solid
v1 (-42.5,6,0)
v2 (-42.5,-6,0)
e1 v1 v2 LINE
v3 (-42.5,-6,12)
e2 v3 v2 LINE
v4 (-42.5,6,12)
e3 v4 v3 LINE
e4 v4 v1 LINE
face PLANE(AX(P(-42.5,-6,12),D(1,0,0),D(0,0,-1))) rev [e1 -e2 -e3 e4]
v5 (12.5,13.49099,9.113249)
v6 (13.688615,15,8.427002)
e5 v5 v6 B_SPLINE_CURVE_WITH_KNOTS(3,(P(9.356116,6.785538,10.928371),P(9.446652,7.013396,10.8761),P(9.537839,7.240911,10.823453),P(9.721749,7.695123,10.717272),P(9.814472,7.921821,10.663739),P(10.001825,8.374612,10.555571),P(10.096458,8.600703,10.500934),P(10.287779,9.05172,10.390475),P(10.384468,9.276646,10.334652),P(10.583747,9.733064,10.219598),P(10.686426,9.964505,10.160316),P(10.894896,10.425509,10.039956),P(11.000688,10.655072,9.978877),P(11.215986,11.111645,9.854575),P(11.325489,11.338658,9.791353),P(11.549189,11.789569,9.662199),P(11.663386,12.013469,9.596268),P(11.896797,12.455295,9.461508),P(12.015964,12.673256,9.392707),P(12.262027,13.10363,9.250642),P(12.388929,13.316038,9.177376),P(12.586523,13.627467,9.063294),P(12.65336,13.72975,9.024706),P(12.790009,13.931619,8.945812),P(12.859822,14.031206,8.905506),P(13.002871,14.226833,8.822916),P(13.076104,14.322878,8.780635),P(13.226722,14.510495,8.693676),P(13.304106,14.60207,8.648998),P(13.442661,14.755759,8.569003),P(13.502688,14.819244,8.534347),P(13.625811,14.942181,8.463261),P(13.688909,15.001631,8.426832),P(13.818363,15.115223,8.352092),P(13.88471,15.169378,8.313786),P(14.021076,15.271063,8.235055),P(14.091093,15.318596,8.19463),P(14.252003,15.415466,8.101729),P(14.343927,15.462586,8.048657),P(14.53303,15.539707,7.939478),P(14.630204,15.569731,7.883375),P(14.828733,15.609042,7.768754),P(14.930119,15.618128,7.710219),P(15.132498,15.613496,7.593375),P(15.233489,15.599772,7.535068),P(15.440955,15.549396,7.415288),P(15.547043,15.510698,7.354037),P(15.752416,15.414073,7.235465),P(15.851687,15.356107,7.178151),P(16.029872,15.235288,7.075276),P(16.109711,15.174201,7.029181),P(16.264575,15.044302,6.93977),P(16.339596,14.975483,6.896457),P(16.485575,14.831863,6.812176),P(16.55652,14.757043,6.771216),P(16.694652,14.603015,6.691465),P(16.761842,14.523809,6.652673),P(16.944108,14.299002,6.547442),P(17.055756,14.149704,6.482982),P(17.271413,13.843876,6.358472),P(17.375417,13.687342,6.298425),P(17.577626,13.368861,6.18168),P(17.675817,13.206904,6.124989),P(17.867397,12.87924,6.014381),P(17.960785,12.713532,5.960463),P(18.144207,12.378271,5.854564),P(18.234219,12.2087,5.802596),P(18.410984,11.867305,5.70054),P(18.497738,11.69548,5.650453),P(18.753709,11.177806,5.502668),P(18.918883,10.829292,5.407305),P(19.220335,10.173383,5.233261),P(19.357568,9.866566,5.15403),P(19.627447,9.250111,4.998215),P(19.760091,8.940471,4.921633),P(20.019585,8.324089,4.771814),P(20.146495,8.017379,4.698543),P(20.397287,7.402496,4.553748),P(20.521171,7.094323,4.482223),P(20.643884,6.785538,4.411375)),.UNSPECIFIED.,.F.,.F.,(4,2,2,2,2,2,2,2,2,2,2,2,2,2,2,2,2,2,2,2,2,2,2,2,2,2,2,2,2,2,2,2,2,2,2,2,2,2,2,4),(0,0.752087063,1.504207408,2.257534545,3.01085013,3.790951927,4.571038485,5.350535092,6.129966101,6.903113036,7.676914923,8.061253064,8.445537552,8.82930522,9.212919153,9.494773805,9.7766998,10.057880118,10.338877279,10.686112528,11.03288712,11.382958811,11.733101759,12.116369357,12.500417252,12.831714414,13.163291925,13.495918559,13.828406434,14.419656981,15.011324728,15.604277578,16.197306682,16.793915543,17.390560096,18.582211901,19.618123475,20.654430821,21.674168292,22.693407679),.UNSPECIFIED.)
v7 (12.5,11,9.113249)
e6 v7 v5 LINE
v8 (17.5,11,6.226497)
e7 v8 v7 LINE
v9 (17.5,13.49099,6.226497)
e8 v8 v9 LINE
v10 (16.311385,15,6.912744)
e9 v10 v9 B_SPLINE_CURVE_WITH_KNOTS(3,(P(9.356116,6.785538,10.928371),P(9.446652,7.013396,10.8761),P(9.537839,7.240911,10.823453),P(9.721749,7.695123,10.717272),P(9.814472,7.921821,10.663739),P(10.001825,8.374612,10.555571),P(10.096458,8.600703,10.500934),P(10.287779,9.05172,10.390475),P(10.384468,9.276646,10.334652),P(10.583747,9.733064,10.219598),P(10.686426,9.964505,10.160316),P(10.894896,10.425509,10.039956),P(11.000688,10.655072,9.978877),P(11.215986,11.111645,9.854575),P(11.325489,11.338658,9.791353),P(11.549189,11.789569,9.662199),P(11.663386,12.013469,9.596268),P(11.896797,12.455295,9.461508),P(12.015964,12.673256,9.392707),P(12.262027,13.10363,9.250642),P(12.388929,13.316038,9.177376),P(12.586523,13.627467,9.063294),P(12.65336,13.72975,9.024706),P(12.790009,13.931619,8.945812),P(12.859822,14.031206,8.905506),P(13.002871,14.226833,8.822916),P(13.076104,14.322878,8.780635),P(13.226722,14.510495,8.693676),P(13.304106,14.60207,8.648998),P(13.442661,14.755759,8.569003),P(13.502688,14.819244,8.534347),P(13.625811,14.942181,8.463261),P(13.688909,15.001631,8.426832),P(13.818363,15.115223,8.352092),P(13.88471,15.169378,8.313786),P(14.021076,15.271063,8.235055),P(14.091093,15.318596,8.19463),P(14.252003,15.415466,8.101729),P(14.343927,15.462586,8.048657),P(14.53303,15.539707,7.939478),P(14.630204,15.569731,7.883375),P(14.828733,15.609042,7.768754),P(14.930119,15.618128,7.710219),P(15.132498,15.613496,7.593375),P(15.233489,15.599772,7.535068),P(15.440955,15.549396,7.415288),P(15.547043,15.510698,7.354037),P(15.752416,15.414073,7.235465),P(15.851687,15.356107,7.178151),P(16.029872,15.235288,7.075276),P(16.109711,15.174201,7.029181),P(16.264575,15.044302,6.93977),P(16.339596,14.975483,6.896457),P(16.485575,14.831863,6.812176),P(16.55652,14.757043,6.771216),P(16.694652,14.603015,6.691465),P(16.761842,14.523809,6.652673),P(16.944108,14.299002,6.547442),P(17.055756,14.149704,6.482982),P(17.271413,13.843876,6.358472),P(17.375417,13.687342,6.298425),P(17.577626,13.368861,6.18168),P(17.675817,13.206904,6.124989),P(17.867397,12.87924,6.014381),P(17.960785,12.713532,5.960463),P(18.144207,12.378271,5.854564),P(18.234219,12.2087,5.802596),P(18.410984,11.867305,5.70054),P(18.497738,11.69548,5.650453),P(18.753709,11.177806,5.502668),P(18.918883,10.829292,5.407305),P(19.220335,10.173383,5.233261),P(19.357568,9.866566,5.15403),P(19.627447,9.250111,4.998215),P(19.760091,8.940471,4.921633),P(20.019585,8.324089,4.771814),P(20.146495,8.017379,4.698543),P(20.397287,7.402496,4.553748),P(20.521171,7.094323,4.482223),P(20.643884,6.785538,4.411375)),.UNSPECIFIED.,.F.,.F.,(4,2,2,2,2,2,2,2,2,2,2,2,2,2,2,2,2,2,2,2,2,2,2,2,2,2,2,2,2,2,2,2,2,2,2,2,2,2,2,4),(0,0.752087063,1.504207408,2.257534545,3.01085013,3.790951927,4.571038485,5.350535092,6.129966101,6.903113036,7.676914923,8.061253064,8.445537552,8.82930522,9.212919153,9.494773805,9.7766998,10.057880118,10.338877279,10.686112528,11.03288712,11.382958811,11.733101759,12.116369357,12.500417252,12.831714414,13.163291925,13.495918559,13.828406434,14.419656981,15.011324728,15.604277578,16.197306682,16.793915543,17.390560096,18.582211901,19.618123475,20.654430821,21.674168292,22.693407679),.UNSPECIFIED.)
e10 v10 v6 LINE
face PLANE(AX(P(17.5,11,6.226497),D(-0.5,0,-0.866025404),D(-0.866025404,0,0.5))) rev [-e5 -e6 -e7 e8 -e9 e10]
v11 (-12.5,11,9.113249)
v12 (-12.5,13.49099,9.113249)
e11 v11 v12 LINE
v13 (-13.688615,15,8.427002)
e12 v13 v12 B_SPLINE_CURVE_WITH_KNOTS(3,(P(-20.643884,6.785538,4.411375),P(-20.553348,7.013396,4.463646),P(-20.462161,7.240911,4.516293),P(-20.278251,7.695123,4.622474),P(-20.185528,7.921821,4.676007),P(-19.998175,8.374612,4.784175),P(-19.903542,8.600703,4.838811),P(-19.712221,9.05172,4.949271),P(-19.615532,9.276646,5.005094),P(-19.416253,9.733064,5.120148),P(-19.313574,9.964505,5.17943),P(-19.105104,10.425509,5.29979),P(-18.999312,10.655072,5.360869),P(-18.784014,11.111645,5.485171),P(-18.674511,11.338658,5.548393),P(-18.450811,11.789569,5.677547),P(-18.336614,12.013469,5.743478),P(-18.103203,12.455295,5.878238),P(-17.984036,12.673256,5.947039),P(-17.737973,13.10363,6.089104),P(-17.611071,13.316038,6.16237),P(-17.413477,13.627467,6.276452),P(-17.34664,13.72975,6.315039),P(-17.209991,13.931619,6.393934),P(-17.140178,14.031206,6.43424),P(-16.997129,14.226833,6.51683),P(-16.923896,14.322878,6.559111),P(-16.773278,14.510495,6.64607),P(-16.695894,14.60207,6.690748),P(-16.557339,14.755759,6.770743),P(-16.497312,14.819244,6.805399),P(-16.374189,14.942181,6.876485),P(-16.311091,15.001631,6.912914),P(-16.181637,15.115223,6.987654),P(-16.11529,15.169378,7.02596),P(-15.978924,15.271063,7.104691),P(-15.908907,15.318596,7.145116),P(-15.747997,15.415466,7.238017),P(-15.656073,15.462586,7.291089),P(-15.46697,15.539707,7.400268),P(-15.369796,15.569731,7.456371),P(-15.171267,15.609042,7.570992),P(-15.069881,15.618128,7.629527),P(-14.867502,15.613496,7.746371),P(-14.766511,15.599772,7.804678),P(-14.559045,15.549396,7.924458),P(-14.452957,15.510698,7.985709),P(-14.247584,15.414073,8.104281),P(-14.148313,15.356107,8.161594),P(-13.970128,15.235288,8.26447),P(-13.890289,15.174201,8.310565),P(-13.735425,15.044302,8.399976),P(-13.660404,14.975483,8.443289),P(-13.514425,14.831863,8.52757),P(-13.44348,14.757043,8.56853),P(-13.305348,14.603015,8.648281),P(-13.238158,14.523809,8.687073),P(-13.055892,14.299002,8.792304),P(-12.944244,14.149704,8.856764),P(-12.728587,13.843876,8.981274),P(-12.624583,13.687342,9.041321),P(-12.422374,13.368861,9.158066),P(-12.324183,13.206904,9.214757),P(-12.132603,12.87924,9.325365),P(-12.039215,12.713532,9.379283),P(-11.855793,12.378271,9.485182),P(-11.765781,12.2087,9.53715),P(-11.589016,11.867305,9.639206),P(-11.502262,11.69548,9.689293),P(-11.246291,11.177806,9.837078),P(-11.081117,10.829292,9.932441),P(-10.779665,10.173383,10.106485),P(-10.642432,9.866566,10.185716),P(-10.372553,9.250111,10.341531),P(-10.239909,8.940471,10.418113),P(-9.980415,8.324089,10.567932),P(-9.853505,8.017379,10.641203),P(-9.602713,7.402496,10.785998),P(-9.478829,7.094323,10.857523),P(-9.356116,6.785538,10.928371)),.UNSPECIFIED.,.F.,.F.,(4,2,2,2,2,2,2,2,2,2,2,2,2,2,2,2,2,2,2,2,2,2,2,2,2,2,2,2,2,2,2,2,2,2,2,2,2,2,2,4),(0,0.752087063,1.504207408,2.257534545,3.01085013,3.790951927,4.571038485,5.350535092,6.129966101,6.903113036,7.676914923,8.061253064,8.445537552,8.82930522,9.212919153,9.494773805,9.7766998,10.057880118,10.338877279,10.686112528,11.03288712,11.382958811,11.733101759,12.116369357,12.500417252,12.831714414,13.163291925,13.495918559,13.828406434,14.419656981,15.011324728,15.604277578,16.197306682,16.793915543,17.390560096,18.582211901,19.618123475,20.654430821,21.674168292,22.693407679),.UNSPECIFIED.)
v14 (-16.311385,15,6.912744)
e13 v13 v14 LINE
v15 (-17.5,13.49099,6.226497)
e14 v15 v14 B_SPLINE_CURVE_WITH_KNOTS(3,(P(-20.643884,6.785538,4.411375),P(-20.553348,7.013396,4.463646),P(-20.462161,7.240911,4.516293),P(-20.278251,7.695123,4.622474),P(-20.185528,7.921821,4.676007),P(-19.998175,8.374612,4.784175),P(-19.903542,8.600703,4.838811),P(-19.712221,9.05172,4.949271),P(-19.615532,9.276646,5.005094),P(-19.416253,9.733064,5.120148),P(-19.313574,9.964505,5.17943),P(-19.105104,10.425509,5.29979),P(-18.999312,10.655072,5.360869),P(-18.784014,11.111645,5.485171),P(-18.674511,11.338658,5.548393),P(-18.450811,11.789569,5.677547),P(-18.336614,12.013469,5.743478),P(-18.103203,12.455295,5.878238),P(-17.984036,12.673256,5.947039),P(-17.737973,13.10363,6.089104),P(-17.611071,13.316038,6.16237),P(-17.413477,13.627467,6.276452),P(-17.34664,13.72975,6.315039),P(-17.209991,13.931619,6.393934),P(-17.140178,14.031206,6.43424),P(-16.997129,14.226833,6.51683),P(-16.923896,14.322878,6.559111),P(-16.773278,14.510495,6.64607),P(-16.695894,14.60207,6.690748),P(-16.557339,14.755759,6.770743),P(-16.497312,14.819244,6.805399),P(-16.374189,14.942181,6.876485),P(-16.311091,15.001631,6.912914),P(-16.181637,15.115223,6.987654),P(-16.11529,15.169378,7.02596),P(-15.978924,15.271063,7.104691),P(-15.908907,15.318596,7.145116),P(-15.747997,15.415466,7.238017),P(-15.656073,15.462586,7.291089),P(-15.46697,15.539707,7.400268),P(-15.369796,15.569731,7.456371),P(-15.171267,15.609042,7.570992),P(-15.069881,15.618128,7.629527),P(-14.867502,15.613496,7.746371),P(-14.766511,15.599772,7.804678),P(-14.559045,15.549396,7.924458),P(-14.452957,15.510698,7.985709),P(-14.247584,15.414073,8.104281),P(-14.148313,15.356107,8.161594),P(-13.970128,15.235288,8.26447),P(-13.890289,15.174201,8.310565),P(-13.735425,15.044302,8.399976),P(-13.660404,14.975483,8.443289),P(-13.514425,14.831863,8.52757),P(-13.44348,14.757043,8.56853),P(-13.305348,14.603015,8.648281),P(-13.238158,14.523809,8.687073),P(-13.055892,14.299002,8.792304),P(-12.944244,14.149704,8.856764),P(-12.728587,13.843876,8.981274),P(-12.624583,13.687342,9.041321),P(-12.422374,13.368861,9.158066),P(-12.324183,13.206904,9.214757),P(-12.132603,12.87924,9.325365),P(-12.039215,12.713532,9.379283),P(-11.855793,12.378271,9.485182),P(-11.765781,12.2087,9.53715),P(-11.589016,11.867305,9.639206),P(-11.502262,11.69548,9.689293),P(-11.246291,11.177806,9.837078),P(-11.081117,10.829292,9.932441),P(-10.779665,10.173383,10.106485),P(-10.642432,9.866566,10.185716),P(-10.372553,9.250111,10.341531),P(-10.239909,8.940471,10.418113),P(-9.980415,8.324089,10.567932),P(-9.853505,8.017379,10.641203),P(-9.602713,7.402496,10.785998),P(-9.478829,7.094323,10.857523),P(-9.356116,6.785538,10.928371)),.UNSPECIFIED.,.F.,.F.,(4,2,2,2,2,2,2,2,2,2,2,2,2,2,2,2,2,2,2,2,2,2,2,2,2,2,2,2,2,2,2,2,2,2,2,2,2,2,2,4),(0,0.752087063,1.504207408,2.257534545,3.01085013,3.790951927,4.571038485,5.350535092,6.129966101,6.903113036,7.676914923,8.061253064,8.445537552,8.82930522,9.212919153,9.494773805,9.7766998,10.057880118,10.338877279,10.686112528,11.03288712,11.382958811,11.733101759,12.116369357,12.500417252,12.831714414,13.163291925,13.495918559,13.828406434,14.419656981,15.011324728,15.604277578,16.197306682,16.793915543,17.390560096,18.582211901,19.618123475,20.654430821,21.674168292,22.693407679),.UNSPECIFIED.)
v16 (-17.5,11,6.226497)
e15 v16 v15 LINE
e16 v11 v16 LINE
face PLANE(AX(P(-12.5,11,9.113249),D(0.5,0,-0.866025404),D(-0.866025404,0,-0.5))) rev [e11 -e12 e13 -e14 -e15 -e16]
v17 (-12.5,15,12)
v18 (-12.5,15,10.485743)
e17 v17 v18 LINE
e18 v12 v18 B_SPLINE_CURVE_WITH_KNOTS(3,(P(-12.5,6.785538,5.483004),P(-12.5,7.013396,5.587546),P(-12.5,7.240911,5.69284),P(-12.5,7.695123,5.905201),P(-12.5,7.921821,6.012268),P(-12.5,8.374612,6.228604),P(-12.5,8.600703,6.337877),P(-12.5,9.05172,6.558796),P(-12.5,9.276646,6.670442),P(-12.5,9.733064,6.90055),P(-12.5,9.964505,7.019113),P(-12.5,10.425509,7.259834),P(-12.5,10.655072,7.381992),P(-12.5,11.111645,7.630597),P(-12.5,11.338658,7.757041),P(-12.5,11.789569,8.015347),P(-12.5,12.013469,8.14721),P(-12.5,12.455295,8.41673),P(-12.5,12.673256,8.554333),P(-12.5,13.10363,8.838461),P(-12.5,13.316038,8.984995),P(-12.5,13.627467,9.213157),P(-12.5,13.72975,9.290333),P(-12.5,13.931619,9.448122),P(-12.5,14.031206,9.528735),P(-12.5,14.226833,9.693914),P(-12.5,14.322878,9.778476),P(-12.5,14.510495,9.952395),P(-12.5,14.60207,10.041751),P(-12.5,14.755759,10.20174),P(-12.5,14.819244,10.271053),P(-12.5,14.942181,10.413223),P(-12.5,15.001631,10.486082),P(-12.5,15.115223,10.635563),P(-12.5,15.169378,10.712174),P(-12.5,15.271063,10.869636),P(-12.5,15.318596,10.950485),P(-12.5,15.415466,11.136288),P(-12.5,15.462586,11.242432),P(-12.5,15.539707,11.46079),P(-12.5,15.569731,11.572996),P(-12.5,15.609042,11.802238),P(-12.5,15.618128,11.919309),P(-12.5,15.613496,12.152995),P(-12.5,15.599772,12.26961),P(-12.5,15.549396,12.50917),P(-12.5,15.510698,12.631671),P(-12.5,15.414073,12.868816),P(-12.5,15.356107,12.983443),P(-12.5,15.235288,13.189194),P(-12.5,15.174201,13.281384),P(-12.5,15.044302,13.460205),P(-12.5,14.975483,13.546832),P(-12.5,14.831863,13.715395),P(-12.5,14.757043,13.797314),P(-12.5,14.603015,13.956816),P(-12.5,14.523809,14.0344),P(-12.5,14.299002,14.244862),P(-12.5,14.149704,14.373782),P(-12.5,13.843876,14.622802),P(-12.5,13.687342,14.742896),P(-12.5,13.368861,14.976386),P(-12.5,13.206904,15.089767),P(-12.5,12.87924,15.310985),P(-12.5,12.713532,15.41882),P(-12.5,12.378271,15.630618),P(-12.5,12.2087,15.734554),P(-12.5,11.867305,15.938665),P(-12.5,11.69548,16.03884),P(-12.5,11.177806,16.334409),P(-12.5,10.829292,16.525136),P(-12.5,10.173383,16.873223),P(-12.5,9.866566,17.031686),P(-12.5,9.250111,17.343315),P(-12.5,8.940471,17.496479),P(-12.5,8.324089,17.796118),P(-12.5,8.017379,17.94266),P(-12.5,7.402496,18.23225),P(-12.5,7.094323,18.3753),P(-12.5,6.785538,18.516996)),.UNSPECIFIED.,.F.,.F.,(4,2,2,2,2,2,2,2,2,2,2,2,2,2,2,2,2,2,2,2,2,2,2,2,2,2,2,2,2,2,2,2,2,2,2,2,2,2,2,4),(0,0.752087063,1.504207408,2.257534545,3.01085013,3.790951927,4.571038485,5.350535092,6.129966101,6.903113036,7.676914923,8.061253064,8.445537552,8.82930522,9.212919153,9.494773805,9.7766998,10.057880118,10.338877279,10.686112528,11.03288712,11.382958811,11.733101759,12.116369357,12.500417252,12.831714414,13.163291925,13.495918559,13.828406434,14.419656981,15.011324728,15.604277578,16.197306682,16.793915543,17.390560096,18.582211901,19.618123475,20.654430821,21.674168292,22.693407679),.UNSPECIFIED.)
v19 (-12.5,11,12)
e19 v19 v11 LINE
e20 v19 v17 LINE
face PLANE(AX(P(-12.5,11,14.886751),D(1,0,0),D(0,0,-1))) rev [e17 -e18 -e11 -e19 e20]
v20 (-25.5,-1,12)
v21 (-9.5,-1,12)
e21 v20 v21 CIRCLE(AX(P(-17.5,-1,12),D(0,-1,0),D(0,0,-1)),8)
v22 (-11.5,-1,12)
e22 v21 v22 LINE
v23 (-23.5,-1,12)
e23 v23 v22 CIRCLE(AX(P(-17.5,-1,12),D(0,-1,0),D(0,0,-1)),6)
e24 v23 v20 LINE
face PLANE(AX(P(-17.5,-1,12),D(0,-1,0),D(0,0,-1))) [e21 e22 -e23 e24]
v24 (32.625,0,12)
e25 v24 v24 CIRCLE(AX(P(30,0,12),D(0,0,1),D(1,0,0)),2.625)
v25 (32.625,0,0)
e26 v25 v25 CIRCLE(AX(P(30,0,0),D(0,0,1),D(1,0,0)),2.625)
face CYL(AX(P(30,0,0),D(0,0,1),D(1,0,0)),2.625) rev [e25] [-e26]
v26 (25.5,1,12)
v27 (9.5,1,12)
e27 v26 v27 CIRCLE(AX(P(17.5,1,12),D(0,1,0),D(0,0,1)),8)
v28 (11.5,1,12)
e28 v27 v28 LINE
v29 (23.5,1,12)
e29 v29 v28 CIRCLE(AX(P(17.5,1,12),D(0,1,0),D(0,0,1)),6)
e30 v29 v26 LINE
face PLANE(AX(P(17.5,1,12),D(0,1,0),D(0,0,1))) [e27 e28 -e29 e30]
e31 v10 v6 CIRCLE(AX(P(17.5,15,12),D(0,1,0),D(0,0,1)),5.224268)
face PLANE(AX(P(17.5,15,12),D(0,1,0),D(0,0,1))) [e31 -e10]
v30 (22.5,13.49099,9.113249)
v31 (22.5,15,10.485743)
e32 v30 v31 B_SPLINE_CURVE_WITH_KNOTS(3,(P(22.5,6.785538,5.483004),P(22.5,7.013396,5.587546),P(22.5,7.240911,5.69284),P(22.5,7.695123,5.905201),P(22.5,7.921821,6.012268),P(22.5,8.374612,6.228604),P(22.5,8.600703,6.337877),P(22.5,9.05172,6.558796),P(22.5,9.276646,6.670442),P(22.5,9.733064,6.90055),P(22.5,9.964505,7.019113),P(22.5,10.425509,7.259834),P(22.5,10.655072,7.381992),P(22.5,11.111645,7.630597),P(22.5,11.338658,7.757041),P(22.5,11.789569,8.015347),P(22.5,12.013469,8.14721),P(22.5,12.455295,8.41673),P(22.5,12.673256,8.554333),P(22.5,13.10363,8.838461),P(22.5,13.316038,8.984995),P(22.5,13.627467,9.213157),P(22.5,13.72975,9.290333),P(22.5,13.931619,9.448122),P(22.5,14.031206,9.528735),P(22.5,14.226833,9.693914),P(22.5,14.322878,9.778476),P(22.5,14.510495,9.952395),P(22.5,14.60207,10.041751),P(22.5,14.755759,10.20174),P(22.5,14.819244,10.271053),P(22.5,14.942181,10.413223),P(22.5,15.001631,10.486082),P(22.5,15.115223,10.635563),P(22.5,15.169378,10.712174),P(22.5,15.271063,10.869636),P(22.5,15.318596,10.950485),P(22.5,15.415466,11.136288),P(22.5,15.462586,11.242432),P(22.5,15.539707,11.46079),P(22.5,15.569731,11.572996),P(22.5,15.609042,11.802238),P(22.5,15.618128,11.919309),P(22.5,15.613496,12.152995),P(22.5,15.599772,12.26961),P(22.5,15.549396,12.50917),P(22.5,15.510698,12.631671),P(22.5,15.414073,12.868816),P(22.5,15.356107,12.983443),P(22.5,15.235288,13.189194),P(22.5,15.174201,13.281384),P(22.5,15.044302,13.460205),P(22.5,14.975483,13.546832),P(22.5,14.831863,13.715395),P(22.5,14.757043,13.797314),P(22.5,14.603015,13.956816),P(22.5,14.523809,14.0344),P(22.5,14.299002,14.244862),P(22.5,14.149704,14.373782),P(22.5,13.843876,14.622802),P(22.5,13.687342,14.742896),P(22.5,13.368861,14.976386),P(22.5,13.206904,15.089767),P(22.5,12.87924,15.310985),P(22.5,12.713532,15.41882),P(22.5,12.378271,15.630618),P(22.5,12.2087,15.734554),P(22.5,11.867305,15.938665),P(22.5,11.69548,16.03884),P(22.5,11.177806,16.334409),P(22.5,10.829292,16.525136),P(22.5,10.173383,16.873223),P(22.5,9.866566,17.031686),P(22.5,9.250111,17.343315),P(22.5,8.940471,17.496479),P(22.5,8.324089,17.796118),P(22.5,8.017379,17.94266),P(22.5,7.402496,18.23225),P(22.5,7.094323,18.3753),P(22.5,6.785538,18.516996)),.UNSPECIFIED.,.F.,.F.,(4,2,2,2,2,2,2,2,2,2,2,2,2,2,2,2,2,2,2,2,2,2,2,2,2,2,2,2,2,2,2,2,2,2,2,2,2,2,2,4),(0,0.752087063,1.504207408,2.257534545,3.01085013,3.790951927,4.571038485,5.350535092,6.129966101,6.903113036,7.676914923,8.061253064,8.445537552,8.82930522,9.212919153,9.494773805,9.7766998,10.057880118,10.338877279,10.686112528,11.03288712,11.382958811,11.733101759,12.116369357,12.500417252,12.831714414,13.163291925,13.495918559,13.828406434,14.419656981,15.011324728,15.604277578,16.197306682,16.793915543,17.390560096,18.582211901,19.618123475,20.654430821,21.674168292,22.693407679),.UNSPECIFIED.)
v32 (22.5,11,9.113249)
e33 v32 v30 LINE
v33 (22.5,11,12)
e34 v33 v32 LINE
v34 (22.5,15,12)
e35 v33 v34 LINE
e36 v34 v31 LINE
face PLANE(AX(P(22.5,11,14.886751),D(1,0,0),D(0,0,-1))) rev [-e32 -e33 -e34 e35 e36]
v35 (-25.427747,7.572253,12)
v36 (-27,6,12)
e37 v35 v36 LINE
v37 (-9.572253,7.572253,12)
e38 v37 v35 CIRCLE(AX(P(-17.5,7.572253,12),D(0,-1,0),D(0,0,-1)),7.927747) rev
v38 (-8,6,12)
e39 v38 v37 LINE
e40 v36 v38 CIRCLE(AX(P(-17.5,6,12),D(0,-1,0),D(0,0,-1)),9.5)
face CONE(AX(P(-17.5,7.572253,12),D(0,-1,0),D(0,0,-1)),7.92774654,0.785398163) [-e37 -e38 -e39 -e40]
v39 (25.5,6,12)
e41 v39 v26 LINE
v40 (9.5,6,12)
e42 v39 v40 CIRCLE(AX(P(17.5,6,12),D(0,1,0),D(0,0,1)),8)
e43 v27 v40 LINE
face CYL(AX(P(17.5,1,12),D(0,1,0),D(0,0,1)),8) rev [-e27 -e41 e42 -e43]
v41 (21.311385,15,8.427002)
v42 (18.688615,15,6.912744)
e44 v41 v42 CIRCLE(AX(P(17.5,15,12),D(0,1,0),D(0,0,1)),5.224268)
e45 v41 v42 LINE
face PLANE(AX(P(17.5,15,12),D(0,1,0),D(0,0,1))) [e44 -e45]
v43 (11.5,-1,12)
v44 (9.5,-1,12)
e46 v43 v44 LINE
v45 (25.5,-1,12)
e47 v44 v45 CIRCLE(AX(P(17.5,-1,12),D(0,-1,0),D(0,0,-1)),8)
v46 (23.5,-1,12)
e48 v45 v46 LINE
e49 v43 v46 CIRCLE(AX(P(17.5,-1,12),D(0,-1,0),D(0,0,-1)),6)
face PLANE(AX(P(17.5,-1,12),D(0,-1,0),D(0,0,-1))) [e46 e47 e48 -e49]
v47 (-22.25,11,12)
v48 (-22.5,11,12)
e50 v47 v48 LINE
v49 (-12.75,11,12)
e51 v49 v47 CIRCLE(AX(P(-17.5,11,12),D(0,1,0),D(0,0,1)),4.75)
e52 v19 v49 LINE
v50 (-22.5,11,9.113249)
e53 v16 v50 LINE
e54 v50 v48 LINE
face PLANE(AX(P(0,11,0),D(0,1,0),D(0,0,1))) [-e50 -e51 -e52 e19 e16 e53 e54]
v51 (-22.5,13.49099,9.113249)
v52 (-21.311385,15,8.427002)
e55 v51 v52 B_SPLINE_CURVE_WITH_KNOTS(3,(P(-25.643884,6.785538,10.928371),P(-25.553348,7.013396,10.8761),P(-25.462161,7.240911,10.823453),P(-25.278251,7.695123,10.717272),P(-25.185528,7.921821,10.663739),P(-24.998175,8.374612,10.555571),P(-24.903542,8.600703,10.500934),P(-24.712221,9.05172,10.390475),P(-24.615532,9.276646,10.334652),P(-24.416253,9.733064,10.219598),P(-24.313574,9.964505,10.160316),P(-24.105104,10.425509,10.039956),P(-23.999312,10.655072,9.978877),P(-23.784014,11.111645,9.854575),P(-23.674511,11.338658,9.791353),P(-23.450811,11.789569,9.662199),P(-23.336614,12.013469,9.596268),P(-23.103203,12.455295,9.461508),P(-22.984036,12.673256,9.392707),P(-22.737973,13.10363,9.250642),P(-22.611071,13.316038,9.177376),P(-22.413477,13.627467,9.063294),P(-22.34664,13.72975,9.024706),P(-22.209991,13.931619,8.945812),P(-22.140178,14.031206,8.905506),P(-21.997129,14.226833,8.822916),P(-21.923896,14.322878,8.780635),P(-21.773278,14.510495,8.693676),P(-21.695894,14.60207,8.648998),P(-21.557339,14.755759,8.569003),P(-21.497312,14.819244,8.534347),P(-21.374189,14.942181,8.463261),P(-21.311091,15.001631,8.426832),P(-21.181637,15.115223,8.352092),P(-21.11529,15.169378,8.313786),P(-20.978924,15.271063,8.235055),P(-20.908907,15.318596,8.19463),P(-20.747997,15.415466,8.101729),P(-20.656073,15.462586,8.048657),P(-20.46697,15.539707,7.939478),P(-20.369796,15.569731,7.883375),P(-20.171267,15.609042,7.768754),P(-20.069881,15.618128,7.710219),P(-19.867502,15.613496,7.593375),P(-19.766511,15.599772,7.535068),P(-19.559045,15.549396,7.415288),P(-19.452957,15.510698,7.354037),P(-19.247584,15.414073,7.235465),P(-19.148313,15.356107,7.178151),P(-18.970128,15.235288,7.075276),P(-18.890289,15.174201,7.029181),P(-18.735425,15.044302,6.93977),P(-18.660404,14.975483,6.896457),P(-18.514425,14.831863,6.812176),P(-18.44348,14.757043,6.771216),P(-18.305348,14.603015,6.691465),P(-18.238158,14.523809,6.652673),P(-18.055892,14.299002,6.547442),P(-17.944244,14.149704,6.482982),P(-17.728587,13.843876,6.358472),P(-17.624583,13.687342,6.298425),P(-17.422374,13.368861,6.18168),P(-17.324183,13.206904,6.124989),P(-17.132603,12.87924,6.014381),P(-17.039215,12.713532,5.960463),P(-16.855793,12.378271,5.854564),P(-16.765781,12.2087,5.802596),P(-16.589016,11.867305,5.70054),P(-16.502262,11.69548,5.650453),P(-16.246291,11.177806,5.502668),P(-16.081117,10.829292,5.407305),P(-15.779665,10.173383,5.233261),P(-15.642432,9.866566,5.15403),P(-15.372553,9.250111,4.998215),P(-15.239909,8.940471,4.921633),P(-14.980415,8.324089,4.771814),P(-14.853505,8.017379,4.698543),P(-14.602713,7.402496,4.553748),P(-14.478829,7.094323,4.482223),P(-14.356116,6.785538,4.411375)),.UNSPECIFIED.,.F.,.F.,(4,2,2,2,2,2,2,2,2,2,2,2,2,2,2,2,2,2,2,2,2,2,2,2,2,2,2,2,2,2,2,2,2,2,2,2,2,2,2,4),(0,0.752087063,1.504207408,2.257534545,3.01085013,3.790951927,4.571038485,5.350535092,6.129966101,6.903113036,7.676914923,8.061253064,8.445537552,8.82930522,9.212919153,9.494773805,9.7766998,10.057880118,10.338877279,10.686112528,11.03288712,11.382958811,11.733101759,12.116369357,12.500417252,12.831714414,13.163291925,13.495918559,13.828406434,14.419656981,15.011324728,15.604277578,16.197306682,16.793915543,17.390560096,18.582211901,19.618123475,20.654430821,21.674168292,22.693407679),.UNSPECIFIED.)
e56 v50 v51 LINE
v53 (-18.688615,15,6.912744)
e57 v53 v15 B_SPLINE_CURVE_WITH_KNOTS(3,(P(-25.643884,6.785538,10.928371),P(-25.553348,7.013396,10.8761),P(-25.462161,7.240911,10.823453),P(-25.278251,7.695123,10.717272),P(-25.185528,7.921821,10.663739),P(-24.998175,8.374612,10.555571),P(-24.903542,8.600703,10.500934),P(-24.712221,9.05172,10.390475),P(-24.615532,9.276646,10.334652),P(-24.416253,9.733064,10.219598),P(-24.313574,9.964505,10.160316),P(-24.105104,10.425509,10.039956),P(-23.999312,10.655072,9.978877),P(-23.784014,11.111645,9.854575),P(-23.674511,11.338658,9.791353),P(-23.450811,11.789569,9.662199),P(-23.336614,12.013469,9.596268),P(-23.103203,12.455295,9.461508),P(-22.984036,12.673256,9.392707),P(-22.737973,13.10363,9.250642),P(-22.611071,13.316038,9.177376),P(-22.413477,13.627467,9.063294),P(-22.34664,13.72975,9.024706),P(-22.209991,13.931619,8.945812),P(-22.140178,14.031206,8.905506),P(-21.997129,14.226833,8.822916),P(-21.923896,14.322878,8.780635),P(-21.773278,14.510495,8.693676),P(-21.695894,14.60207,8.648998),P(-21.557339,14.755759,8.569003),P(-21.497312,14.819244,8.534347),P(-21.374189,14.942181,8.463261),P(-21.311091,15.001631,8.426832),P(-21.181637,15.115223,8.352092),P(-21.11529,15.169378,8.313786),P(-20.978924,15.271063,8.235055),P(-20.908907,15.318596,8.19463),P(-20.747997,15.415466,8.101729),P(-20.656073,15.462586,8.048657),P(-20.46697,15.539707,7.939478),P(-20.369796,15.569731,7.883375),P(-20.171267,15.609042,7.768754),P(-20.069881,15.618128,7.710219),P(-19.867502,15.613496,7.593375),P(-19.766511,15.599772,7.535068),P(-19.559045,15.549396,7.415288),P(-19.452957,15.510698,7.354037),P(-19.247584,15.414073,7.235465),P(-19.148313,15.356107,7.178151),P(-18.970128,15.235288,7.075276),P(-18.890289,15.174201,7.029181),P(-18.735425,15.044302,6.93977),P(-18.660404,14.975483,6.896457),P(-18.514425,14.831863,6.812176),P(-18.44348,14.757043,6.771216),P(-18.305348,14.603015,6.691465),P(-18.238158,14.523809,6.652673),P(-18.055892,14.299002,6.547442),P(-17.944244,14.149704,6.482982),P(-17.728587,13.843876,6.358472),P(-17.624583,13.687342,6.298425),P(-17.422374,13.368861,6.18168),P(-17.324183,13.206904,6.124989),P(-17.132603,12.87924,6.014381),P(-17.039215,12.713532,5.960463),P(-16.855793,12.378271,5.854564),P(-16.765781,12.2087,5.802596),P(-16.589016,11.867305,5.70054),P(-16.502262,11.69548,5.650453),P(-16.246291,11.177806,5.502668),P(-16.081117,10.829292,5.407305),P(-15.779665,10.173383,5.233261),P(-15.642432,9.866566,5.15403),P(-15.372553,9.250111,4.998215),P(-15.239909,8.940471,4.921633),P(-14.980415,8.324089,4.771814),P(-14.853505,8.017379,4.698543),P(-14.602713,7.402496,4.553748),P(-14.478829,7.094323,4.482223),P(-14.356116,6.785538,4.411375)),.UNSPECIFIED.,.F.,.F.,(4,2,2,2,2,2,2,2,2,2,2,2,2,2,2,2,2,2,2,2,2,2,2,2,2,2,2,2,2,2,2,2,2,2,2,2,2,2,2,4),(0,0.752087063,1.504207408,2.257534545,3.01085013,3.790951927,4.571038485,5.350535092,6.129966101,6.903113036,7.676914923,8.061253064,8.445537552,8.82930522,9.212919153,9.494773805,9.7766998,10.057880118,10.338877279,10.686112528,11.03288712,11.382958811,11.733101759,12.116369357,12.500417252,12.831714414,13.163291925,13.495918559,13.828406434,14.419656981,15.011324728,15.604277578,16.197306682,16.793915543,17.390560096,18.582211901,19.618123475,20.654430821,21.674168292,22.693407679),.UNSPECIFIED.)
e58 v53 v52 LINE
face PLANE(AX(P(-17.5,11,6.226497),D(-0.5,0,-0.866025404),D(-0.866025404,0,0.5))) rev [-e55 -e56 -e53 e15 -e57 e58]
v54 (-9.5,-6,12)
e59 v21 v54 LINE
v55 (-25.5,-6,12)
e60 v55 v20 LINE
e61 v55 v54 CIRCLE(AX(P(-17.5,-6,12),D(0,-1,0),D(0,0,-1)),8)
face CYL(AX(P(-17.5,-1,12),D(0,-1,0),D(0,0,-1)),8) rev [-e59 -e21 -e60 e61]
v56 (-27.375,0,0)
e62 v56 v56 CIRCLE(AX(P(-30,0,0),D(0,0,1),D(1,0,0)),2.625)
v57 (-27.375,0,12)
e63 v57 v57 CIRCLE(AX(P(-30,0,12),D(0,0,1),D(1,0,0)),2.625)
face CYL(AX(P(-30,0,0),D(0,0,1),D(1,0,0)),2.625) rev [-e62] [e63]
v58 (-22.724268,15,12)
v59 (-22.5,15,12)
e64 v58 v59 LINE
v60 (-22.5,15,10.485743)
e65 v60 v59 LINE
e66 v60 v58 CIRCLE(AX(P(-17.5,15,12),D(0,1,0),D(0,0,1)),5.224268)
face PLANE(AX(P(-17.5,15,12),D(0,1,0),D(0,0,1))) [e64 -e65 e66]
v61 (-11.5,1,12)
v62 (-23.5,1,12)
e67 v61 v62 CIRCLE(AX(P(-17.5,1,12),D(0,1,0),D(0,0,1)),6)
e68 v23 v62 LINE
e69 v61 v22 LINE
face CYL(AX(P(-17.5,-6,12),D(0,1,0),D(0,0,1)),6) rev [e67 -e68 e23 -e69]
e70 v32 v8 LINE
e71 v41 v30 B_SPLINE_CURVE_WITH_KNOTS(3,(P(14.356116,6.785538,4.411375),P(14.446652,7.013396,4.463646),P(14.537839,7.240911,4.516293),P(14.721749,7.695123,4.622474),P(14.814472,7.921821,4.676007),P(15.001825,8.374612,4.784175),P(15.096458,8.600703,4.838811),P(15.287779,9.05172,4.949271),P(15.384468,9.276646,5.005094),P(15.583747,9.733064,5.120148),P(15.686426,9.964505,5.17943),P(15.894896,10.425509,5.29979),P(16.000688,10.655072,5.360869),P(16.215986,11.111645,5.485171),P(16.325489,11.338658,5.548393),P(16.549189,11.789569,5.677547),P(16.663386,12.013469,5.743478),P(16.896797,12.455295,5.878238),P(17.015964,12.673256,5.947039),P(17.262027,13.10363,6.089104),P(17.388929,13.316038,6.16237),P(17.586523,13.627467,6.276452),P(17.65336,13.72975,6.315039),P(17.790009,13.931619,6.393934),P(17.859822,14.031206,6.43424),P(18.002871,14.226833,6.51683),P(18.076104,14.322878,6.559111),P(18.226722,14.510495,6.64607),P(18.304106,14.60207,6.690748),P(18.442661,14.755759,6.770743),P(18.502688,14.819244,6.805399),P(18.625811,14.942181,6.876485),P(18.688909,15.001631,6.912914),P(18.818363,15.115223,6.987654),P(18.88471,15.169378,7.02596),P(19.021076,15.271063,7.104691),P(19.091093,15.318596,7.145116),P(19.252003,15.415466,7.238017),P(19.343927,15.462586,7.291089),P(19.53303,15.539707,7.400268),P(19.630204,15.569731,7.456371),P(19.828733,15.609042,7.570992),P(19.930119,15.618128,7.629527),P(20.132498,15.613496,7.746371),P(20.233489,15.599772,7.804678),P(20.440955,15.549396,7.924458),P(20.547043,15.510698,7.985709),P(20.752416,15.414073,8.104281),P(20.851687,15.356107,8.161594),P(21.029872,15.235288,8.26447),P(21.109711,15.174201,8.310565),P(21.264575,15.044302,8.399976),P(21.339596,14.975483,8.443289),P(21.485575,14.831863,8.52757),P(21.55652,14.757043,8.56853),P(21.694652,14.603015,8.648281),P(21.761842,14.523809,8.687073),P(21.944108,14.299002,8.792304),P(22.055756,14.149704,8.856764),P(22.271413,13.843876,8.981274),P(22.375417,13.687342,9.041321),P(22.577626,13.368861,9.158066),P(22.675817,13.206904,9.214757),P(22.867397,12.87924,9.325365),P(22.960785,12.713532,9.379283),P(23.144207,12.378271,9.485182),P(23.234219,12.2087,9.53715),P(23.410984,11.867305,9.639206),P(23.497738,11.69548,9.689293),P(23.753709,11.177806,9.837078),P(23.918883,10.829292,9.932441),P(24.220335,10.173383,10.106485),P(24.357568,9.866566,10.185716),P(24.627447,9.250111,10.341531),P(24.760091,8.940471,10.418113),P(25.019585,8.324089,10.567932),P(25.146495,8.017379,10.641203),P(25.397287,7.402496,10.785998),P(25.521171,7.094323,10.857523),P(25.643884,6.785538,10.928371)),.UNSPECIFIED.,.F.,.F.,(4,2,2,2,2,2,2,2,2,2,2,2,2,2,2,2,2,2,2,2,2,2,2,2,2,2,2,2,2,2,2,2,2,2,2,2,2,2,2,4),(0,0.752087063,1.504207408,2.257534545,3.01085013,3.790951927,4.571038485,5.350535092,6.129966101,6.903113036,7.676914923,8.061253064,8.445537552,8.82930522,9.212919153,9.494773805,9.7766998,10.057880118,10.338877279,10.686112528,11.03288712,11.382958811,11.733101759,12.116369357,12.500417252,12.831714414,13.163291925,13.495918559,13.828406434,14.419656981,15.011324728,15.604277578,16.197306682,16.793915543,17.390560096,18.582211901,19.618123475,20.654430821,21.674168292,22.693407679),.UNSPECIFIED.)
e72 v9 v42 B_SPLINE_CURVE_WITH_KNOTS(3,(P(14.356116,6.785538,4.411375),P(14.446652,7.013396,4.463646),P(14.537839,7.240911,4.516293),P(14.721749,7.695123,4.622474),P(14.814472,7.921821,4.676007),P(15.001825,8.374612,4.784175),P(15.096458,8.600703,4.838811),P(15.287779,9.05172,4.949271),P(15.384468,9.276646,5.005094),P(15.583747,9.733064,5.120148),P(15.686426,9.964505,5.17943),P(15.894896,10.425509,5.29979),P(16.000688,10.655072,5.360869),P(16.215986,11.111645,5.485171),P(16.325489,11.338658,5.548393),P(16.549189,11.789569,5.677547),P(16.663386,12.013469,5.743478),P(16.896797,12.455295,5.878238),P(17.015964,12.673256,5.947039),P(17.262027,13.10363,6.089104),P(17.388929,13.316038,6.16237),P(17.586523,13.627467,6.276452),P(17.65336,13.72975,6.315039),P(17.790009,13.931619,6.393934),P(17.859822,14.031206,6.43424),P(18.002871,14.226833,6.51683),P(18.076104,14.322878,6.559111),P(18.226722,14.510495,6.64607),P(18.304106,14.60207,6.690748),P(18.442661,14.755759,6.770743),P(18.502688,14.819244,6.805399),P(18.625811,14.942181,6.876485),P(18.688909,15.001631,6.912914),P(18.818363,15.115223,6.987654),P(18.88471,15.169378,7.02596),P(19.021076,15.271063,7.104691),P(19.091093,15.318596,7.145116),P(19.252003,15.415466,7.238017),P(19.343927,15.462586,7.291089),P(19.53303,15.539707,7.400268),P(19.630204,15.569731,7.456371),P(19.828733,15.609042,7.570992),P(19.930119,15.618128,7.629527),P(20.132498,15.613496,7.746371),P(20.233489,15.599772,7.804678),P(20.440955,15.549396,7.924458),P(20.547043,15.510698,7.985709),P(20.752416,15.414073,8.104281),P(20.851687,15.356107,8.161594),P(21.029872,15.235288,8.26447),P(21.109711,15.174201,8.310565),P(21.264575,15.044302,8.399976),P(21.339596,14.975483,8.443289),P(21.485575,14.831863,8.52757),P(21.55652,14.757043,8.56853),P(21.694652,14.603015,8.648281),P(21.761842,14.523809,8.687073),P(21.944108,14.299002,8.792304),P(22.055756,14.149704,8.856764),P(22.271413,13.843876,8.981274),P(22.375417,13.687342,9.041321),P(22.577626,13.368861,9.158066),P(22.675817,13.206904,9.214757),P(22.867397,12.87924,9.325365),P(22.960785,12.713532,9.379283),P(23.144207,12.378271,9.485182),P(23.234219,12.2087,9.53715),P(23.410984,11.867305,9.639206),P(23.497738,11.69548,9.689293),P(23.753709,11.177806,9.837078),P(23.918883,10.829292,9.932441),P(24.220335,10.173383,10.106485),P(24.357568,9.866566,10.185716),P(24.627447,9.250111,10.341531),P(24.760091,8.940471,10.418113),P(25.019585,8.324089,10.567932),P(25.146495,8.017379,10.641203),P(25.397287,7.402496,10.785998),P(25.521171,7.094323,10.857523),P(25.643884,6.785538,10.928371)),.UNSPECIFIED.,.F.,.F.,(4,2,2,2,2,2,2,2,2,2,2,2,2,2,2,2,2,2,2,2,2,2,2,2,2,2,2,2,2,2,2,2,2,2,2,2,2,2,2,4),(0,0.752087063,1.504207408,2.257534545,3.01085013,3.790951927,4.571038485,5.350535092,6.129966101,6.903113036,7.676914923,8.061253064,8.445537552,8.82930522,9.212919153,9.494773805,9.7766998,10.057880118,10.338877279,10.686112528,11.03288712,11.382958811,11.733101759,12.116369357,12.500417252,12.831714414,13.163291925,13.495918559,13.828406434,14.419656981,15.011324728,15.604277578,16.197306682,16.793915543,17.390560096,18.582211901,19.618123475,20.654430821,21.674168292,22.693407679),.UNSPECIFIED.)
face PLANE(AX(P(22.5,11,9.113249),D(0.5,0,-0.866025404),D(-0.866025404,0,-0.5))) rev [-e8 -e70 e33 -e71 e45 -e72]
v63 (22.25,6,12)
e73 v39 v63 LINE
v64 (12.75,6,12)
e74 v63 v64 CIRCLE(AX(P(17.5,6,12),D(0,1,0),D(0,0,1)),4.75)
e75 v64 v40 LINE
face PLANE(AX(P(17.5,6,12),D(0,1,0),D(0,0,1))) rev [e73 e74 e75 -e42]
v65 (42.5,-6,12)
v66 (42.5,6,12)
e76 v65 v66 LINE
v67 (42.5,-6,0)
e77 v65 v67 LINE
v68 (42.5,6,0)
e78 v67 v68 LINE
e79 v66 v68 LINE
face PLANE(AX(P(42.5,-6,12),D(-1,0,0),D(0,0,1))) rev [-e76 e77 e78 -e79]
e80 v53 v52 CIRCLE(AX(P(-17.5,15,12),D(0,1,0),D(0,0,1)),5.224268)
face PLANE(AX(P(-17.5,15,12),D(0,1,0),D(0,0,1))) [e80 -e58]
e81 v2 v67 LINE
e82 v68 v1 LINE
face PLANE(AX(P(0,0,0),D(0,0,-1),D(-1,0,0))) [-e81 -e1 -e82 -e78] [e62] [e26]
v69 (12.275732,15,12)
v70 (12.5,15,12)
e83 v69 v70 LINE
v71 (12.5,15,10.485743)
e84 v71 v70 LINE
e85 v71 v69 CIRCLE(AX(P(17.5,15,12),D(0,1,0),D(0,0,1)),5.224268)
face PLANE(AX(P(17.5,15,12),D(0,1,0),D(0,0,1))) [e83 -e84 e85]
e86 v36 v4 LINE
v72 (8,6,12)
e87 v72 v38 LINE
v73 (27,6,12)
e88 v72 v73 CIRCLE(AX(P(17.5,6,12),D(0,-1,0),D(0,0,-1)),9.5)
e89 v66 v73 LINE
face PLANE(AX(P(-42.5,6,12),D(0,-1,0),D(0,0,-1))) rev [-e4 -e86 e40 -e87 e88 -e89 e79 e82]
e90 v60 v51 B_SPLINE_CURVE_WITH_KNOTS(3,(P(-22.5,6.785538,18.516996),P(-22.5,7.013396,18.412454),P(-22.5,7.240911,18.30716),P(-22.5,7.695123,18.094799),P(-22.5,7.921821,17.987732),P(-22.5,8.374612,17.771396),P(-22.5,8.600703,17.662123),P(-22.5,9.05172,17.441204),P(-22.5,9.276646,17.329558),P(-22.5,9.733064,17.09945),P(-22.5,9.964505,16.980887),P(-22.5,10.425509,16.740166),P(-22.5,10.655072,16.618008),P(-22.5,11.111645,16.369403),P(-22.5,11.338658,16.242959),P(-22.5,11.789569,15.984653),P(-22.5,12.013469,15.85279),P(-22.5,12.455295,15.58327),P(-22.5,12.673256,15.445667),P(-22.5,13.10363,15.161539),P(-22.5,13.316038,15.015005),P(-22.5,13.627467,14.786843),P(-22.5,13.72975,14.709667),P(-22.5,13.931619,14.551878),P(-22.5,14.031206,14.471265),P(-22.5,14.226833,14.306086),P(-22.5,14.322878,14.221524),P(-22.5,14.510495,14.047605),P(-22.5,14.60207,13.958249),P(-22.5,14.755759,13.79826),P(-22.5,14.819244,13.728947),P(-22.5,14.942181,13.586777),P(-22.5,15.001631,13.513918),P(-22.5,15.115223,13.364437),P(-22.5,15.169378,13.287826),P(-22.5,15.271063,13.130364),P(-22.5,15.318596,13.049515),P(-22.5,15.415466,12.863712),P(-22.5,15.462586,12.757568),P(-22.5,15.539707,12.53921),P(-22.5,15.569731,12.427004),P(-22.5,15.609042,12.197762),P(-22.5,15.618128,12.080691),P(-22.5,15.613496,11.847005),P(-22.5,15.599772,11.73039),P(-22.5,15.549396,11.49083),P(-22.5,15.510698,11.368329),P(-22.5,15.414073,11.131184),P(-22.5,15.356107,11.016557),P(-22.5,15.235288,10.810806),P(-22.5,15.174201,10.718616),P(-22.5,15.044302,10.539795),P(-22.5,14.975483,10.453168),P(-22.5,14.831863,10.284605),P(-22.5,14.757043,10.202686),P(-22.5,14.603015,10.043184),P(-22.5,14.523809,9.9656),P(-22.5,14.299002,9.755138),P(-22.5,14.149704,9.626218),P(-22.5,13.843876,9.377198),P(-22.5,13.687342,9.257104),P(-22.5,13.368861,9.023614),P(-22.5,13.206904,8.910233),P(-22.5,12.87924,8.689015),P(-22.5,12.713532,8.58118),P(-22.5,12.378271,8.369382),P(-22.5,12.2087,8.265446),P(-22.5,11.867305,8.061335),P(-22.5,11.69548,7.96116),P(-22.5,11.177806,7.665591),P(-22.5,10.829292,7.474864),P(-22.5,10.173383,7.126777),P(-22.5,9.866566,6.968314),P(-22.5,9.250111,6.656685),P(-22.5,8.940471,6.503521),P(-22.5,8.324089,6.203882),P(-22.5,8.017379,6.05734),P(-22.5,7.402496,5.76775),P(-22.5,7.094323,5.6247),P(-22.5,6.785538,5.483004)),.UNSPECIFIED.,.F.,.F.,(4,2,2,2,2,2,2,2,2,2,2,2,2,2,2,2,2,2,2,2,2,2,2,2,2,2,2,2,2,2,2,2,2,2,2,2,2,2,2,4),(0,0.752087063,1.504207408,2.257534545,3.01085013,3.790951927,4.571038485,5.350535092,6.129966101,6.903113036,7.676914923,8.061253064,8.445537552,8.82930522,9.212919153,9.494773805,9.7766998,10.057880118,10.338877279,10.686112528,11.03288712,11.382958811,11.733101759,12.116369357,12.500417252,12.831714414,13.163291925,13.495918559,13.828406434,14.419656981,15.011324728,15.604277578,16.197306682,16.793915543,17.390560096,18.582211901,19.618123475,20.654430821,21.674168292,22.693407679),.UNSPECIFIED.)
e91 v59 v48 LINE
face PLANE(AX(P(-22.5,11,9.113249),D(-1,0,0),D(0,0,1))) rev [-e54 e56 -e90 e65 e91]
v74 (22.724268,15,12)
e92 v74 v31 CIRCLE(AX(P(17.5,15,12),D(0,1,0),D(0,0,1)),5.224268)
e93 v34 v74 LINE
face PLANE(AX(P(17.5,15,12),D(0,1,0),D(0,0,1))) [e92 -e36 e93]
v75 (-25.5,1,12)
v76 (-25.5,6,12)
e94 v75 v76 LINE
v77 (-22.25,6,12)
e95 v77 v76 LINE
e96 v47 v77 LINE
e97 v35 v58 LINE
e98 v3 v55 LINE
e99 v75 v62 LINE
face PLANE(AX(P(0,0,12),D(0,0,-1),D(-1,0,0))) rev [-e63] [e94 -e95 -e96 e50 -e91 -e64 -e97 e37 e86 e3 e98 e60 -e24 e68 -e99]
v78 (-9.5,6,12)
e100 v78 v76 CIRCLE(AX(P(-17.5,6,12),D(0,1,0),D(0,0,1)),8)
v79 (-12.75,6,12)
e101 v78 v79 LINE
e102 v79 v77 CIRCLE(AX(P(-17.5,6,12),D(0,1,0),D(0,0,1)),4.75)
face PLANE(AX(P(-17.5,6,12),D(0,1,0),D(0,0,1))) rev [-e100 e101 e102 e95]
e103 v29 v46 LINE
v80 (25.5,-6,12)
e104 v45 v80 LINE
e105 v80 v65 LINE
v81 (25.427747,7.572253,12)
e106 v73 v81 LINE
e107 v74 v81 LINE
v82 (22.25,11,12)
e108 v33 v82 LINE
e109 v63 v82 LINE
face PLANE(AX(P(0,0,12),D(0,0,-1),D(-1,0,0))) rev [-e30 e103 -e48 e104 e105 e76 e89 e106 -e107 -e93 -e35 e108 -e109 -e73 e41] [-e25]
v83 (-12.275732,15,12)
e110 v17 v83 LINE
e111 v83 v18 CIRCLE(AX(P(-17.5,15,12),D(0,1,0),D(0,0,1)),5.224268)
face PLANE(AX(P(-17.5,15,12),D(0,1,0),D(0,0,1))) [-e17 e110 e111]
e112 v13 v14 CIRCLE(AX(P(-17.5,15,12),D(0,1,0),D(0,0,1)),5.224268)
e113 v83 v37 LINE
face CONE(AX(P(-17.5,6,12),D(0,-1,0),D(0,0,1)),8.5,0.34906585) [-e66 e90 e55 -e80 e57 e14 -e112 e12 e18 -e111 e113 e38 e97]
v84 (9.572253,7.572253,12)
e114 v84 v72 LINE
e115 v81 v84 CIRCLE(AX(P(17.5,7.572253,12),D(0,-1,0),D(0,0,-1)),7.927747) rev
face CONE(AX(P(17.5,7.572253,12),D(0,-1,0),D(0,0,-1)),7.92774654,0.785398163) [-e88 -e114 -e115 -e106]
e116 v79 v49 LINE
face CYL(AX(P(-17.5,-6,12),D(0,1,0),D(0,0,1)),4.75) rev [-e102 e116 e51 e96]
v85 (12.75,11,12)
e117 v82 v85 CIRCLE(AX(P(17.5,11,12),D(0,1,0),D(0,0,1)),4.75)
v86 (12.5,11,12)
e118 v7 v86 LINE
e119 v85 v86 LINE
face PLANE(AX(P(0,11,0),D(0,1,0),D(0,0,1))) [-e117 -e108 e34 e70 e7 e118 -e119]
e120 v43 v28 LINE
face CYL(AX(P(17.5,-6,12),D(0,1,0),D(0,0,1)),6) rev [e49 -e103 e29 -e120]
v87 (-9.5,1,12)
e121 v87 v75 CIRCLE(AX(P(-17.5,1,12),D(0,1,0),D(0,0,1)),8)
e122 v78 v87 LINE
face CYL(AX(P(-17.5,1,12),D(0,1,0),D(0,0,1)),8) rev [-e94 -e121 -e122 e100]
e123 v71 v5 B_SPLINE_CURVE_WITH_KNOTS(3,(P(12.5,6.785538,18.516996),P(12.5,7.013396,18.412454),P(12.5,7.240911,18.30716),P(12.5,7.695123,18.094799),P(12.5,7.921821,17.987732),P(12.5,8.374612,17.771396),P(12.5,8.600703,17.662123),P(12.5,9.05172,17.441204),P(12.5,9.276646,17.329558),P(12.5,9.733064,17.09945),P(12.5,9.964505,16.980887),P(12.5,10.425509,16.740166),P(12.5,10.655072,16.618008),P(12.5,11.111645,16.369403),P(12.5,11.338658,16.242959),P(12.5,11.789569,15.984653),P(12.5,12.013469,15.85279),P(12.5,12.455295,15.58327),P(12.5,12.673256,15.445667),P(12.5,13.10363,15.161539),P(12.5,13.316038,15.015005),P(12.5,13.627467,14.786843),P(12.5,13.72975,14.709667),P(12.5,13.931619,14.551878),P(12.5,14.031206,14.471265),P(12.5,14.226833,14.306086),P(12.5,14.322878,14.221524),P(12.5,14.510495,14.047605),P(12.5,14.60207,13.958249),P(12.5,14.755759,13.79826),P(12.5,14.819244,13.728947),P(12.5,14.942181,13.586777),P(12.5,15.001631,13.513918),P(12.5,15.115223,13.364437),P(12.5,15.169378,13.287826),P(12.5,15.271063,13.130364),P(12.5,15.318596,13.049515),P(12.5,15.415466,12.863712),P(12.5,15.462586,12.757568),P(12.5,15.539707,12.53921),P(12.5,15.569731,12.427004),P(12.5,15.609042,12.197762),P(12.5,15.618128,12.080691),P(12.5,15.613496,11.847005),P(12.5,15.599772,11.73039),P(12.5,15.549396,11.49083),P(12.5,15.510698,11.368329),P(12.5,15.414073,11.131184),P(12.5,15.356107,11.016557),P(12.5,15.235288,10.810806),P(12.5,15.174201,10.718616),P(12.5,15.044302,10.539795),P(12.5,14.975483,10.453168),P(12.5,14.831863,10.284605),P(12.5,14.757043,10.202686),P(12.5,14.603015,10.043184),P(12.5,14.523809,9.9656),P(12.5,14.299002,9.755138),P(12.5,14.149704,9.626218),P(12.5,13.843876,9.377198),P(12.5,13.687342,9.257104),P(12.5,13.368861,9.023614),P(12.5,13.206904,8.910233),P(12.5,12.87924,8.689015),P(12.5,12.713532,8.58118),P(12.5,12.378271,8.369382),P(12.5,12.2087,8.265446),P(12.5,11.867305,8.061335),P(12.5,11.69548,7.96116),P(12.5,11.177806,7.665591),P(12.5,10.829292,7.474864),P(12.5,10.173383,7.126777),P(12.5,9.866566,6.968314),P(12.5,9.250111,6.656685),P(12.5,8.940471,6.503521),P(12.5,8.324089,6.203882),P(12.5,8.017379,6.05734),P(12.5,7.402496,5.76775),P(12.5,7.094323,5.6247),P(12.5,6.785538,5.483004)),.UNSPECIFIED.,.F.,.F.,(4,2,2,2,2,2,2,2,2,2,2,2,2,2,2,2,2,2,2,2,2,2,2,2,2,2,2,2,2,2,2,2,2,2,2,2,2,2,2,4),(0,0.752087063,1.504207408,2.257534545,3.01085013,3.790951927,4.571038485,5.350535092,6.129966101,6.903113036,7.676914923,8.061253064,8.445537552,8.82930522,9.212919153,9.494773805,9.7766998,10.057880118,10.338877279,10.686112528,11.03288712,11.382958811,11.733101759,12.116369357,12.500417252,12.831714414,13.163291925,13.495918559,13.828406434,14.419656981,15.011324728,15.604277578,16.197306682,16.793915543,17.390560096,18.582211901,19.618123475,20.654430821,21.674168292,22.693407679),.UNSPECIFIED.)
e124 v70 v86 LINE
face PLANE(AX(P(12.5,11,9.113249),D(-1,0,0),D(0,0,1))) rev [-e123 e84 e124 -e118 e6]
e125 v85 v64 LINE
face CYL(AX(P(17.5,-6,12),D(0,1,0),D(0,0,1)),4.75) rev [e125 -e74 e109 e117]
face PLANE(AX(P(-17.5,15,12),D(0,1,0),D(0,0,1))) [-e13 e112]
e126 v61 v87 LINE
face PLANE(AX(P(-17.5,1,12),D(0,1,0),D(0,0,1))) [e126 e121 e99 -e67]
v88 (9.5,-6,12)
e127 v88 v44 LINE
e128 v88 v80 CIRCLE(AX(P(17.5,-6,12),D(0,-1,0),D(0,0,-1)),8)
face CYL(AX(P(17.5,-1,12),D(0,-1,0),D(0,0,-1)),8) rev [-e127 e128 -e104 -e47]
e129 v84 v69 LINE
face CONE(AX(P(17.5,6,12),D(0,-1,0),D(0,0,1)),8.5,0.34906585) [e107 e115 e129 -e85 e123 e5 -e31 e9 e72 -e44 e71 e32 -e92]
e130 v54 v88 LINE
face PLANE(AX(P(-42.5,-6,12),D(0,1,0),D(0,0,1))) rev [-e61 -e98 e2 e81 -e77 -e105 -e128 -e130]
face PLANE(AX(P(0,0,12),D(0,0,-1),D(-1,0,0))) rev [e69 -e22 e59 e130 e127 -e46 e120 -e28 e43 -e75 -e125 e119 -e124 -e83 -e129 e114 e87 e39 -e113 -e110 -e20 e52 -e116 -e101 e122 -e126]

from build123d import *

# Parameters (mm, degrees)
SKETCH1_W                     = 85
SKETCH1_H                     = 12
BOSS_EXTRUDE1_DEPTH           = 12
SKETCH2_R                     = 8
CUT_EXTRUDE2_DEPTH            = 5
CUT_EXTRUDE3_START            = -5
SKETCH3_R                     = 8
CUT_EXTRUDE3_DEPTH            = 5
CUT_EXTRUDE4_DEPTH            = 45.567364741
CUT_EXTRUDE4_DEPTH_BACK       = 45.567364741
SKETCH4_R                     = 6
SKETCH5_R                     = 2.625
CUT_EXTRUDE6_DEPTH            = 45.567364741
SKETCH7_R                     = 8.5
BOSS_EXTRUDE3_DEPTH           = 9
BOSS_EXTRUDE3_DRAFT           = 20
BOSS_EXTRUDE3_PROFILE_2_DEPTH = 9
BOSS_EXTRUDE3_PROFILE_2_DRAFT = 20
CHAMFER1_SIZE                 = 1.673157185
CHAMFER1_SIZE_2               = 1
CHAMFER2_SIZE                 = 1
CHAMFER2_SIZE_2               = 1.673157185
CUT_EXTRUDE9_DEPTH            = 4
SKETCH11_R                    = 4.75
CUT_EXTRUDE10_DEPTH           = 51.154760492
SKETCH12_W                    = 84.776225192
SKETCH12_H                    = 9.817436209
CUT_EXTRUDE11_DEPTH           = 52.647846034


with BuildPart() as part:
    # Sketch1 → Boss-Extrude1 (new body)
    with BuildSketch(Plane.XY):
        Rectangle(SKETCH1_W, SKETCH1_H)
    extrude(amount=BOSS_EXTRUDE1_DEPTH)

    # Sketch2 → Cut-Extrude2 (cut)
    with BuildSketch(Plane(origin=(0, 6, 0), x_dir=(1, 0, 0), z_dir=(0, 1, 0))):
        with Locations((-17.5, -12)):
            Circle(SKETCH2_R)
        with Locations((17.5, -12)):
            Circle(SKETCH2_R)
    extrude(amount=-CUT_EXTRUDE2_DEPTH, mode=Mode.SUBTRACT)

    # Sketch3 → Cut-Extrude3 (cut)
    with BuildSketch(Plane.XZ.offset(6).offset(CUT_EXTRUDE3_START)):
        with Locations((-17.5, 12)):
            Circle(SKETCH3_R)
        with Locations((17.5, 12)):
            Circle(SKETCH3_R)
    extrude(amount=CUT_EXTRUDE3_DEPTH, mode=Mode.SUBTRACT)

    # Sketch4 → Cut-Extrude4 (cut, two sides: drawn at the far end of the back side and taken through both)
    with BuildSketch(Plane(origin=(0, 0, 0), x_dir=(1, 0, 0), z_dir=(0, 1, 0)).offset(-CUT_EXTRUDE4_DEPTH_BACK)):
        with Locations((-17.5, -12)):
            Circle(SKETCH4_R)
        with Locations((17.5, -12)):
            Circle(SKETCH4_R)
    extrude(amount=CUT_EXTRUDE4_DEPTH + CUT_EXTRUDE4_DEPTH_BACK, mode=Mode.SUBTRACT)

    # Sketch5 → Cut-Extrude6 (cut, through all)
    with BuildSketch(Plane.XY.offset(12)):
        with Locations((-30, 0)):
            Circle(SKETCH5_R)
        with Locations((30, 0)):
            Circle(SKETCH5_R)
    extrude(amount=-CUT_EXTRUDE6_DEPTH, mode=Mode.SUBTRACT)


with BuildPart() as boss_extrude3_tool:
    # Sketch7 → Boss-Extrude3 (with draft: the straight prism first)
    with BuildSketch(Plane(origin=(0, 6, 0), x_dir=(1, 0, 0), z_dir=(0, 1, 0))):
        with Locations((-17.5, -12)):
            Circle(SKETCH7_R)
    extrude(amount=BOSS_EXTRUDE3_DEPTH)
    # Boss-Extrude3: the draft: its side faces are tilted about the plane it starts from
    boss_extrude3_sides = [boss_extrude3_tool.faces().sort_by_distance(p)[0] for p in [
        (-26, 10.5, 12),
    ]]
    draft(boss_extrude3_sides, Plane(origin=(0, 6, 0), x_dir=(1, 0, 0), z_dir=(0, 1, 0)), BOSS_EXTRUDE3_DRAFT)


with BuildPart() as part_1:
    add(part.part)

    # Boss-Extrude3: add boss_extrude3_tool
    add(boss_extrude3_tool.part)


with BuildPart() as boss_extrude3_profile_2_tool:
    # Sketch7 → Boss-Extrude3 profile 2 (with draft: the straight prism first)
    with BuildSketch(Plane(origin=(0, 6, 0), x_dir=(1, 0, 0), z_dir=(0, 1, 0))):
        with Locations((17.5, -12)):
            Circle(SKETCH7_R)
    extrude(amount=BOSS_EXTRUDE3_PROFILE_2_DEPTH)
    # Boss-Extrude3 profile 2: the draft: its side faces are tilted about the plane it starts from
    boss_extrude3_profile_2_sides = [boss_extrude3_profile_2_tool.faces().sort_by_distance(p)[0] for p in [
        (9, 10.5, 12),
    ]]
    draft(boss_extrude3_profile_2_sides, Plane(origin=(0, 6, 0), x_dir=(1, 0, 0), z_dir=(0, 1, 0)), BOSS_EXTRUDE3_PROFILE_2_DRAFT)


with BuildPart() as part_2:
    add(part_1.part)

    # Boss-Extrude3 profile 2: add boss_extrude3_profile_2_tool
    add(boss_extrude3_profile_2_tool.part)

    # Chamfer1
    # the kernel refuses this chamfer: 1.673157185, 1 mm, written as the material it adds along each edge
    with BuildSketch(Plane(origin=(-17.5, 6, 12), x_dir=(1, 0, 0), z_dir=(0, 0, 1))) as chamfer1_piece_1:
        Polygon((8.5 - CHAMFER1_SIZE * 0.342020143346, CHAMFER1_SIZE * 0.939692620843), (8.5 + CHAMFER1_SIZE_2, 0), (8.5, 0), align=None)
    revolve(axis=Axis((-17.5, 6, 12), (0, 1, 0)), revolution_arc=180)

    # Chamfer2
    # the kernel refuses this chamfer: 1.673157185, 1 mm, written as the material it adds along each edge
    with BuildSketch(Plane(origin=(17.5, 6, 12), x_dir=(1, 0, 0), z_dir=(0, 0, 1))) as chamfer2_piece_1:
        Polygon((8.5 + CHAMFER2_SIZE, 0), (8.5 - CHAMFER2_SIZE_2 * 0.342020143346, CHAMFER2_SIZE_2 * 0.939692620843), (8.5, 0), align=None)
    revolve(axis=Axis((17.5, 6, 12), (0, 1, 0)), revolution_arc=180)

    # Sketch10 → Cut-Extrude9 (cut)
    with BuildSketch(Plane(origin=(0, 15, 0), x_dir=(1, 0, 0), z_dir=(0, 1, 0))):
        Polygon((-17.5, -6.226497308), (-22.5, -9.113248654), (-22.5, -14.886751346), (-17.5, -17.773502692), (-12.5, -14.886751346), (-12.5, -9.113248654), align=None)
        Polygon((17.5, -6.226497308), (12.5, -9.113248654), (12.5, -14.886751346), (17.5, -17.773502692), (22.5, -14.886751346), (22.5, -9.113248654), align=None)
    extrude(amount=-CUT_EXTRUDE9_DEPTH, mode=Mode.SUBTRACT)

    # Sketch11 → Cut-Extrude10 (cut, through all)
    with BuildSketch(Plane(origin=(0, 11, 0), x_dir=(1, 0, 0), z_dir=(0, 1, 0))):
        with Locations((-17.5, -12)):
            Circle(SKETCH11_R)
        with Locations((17.5, -12)):
            Circle(SKETCH11_R)
    extrude(amount=-CUT_EXTRUDE10_DEPTH, mode=Mode.SUBTRACT)

    # Sketch12 → Cut-Extrude11 (cut, through all)
    with BuildSketch(Plane.XZ.offset(6)):
        with Locations((-0.111887404, 16.908718105)):
            Rectangle(SKETCH12_W, SKETCH12_H)
    extrude(amount=-CUT_EXTRUDE11_DEPTH, mode=Mode.SUBTRACT)


solid = part_2.part
